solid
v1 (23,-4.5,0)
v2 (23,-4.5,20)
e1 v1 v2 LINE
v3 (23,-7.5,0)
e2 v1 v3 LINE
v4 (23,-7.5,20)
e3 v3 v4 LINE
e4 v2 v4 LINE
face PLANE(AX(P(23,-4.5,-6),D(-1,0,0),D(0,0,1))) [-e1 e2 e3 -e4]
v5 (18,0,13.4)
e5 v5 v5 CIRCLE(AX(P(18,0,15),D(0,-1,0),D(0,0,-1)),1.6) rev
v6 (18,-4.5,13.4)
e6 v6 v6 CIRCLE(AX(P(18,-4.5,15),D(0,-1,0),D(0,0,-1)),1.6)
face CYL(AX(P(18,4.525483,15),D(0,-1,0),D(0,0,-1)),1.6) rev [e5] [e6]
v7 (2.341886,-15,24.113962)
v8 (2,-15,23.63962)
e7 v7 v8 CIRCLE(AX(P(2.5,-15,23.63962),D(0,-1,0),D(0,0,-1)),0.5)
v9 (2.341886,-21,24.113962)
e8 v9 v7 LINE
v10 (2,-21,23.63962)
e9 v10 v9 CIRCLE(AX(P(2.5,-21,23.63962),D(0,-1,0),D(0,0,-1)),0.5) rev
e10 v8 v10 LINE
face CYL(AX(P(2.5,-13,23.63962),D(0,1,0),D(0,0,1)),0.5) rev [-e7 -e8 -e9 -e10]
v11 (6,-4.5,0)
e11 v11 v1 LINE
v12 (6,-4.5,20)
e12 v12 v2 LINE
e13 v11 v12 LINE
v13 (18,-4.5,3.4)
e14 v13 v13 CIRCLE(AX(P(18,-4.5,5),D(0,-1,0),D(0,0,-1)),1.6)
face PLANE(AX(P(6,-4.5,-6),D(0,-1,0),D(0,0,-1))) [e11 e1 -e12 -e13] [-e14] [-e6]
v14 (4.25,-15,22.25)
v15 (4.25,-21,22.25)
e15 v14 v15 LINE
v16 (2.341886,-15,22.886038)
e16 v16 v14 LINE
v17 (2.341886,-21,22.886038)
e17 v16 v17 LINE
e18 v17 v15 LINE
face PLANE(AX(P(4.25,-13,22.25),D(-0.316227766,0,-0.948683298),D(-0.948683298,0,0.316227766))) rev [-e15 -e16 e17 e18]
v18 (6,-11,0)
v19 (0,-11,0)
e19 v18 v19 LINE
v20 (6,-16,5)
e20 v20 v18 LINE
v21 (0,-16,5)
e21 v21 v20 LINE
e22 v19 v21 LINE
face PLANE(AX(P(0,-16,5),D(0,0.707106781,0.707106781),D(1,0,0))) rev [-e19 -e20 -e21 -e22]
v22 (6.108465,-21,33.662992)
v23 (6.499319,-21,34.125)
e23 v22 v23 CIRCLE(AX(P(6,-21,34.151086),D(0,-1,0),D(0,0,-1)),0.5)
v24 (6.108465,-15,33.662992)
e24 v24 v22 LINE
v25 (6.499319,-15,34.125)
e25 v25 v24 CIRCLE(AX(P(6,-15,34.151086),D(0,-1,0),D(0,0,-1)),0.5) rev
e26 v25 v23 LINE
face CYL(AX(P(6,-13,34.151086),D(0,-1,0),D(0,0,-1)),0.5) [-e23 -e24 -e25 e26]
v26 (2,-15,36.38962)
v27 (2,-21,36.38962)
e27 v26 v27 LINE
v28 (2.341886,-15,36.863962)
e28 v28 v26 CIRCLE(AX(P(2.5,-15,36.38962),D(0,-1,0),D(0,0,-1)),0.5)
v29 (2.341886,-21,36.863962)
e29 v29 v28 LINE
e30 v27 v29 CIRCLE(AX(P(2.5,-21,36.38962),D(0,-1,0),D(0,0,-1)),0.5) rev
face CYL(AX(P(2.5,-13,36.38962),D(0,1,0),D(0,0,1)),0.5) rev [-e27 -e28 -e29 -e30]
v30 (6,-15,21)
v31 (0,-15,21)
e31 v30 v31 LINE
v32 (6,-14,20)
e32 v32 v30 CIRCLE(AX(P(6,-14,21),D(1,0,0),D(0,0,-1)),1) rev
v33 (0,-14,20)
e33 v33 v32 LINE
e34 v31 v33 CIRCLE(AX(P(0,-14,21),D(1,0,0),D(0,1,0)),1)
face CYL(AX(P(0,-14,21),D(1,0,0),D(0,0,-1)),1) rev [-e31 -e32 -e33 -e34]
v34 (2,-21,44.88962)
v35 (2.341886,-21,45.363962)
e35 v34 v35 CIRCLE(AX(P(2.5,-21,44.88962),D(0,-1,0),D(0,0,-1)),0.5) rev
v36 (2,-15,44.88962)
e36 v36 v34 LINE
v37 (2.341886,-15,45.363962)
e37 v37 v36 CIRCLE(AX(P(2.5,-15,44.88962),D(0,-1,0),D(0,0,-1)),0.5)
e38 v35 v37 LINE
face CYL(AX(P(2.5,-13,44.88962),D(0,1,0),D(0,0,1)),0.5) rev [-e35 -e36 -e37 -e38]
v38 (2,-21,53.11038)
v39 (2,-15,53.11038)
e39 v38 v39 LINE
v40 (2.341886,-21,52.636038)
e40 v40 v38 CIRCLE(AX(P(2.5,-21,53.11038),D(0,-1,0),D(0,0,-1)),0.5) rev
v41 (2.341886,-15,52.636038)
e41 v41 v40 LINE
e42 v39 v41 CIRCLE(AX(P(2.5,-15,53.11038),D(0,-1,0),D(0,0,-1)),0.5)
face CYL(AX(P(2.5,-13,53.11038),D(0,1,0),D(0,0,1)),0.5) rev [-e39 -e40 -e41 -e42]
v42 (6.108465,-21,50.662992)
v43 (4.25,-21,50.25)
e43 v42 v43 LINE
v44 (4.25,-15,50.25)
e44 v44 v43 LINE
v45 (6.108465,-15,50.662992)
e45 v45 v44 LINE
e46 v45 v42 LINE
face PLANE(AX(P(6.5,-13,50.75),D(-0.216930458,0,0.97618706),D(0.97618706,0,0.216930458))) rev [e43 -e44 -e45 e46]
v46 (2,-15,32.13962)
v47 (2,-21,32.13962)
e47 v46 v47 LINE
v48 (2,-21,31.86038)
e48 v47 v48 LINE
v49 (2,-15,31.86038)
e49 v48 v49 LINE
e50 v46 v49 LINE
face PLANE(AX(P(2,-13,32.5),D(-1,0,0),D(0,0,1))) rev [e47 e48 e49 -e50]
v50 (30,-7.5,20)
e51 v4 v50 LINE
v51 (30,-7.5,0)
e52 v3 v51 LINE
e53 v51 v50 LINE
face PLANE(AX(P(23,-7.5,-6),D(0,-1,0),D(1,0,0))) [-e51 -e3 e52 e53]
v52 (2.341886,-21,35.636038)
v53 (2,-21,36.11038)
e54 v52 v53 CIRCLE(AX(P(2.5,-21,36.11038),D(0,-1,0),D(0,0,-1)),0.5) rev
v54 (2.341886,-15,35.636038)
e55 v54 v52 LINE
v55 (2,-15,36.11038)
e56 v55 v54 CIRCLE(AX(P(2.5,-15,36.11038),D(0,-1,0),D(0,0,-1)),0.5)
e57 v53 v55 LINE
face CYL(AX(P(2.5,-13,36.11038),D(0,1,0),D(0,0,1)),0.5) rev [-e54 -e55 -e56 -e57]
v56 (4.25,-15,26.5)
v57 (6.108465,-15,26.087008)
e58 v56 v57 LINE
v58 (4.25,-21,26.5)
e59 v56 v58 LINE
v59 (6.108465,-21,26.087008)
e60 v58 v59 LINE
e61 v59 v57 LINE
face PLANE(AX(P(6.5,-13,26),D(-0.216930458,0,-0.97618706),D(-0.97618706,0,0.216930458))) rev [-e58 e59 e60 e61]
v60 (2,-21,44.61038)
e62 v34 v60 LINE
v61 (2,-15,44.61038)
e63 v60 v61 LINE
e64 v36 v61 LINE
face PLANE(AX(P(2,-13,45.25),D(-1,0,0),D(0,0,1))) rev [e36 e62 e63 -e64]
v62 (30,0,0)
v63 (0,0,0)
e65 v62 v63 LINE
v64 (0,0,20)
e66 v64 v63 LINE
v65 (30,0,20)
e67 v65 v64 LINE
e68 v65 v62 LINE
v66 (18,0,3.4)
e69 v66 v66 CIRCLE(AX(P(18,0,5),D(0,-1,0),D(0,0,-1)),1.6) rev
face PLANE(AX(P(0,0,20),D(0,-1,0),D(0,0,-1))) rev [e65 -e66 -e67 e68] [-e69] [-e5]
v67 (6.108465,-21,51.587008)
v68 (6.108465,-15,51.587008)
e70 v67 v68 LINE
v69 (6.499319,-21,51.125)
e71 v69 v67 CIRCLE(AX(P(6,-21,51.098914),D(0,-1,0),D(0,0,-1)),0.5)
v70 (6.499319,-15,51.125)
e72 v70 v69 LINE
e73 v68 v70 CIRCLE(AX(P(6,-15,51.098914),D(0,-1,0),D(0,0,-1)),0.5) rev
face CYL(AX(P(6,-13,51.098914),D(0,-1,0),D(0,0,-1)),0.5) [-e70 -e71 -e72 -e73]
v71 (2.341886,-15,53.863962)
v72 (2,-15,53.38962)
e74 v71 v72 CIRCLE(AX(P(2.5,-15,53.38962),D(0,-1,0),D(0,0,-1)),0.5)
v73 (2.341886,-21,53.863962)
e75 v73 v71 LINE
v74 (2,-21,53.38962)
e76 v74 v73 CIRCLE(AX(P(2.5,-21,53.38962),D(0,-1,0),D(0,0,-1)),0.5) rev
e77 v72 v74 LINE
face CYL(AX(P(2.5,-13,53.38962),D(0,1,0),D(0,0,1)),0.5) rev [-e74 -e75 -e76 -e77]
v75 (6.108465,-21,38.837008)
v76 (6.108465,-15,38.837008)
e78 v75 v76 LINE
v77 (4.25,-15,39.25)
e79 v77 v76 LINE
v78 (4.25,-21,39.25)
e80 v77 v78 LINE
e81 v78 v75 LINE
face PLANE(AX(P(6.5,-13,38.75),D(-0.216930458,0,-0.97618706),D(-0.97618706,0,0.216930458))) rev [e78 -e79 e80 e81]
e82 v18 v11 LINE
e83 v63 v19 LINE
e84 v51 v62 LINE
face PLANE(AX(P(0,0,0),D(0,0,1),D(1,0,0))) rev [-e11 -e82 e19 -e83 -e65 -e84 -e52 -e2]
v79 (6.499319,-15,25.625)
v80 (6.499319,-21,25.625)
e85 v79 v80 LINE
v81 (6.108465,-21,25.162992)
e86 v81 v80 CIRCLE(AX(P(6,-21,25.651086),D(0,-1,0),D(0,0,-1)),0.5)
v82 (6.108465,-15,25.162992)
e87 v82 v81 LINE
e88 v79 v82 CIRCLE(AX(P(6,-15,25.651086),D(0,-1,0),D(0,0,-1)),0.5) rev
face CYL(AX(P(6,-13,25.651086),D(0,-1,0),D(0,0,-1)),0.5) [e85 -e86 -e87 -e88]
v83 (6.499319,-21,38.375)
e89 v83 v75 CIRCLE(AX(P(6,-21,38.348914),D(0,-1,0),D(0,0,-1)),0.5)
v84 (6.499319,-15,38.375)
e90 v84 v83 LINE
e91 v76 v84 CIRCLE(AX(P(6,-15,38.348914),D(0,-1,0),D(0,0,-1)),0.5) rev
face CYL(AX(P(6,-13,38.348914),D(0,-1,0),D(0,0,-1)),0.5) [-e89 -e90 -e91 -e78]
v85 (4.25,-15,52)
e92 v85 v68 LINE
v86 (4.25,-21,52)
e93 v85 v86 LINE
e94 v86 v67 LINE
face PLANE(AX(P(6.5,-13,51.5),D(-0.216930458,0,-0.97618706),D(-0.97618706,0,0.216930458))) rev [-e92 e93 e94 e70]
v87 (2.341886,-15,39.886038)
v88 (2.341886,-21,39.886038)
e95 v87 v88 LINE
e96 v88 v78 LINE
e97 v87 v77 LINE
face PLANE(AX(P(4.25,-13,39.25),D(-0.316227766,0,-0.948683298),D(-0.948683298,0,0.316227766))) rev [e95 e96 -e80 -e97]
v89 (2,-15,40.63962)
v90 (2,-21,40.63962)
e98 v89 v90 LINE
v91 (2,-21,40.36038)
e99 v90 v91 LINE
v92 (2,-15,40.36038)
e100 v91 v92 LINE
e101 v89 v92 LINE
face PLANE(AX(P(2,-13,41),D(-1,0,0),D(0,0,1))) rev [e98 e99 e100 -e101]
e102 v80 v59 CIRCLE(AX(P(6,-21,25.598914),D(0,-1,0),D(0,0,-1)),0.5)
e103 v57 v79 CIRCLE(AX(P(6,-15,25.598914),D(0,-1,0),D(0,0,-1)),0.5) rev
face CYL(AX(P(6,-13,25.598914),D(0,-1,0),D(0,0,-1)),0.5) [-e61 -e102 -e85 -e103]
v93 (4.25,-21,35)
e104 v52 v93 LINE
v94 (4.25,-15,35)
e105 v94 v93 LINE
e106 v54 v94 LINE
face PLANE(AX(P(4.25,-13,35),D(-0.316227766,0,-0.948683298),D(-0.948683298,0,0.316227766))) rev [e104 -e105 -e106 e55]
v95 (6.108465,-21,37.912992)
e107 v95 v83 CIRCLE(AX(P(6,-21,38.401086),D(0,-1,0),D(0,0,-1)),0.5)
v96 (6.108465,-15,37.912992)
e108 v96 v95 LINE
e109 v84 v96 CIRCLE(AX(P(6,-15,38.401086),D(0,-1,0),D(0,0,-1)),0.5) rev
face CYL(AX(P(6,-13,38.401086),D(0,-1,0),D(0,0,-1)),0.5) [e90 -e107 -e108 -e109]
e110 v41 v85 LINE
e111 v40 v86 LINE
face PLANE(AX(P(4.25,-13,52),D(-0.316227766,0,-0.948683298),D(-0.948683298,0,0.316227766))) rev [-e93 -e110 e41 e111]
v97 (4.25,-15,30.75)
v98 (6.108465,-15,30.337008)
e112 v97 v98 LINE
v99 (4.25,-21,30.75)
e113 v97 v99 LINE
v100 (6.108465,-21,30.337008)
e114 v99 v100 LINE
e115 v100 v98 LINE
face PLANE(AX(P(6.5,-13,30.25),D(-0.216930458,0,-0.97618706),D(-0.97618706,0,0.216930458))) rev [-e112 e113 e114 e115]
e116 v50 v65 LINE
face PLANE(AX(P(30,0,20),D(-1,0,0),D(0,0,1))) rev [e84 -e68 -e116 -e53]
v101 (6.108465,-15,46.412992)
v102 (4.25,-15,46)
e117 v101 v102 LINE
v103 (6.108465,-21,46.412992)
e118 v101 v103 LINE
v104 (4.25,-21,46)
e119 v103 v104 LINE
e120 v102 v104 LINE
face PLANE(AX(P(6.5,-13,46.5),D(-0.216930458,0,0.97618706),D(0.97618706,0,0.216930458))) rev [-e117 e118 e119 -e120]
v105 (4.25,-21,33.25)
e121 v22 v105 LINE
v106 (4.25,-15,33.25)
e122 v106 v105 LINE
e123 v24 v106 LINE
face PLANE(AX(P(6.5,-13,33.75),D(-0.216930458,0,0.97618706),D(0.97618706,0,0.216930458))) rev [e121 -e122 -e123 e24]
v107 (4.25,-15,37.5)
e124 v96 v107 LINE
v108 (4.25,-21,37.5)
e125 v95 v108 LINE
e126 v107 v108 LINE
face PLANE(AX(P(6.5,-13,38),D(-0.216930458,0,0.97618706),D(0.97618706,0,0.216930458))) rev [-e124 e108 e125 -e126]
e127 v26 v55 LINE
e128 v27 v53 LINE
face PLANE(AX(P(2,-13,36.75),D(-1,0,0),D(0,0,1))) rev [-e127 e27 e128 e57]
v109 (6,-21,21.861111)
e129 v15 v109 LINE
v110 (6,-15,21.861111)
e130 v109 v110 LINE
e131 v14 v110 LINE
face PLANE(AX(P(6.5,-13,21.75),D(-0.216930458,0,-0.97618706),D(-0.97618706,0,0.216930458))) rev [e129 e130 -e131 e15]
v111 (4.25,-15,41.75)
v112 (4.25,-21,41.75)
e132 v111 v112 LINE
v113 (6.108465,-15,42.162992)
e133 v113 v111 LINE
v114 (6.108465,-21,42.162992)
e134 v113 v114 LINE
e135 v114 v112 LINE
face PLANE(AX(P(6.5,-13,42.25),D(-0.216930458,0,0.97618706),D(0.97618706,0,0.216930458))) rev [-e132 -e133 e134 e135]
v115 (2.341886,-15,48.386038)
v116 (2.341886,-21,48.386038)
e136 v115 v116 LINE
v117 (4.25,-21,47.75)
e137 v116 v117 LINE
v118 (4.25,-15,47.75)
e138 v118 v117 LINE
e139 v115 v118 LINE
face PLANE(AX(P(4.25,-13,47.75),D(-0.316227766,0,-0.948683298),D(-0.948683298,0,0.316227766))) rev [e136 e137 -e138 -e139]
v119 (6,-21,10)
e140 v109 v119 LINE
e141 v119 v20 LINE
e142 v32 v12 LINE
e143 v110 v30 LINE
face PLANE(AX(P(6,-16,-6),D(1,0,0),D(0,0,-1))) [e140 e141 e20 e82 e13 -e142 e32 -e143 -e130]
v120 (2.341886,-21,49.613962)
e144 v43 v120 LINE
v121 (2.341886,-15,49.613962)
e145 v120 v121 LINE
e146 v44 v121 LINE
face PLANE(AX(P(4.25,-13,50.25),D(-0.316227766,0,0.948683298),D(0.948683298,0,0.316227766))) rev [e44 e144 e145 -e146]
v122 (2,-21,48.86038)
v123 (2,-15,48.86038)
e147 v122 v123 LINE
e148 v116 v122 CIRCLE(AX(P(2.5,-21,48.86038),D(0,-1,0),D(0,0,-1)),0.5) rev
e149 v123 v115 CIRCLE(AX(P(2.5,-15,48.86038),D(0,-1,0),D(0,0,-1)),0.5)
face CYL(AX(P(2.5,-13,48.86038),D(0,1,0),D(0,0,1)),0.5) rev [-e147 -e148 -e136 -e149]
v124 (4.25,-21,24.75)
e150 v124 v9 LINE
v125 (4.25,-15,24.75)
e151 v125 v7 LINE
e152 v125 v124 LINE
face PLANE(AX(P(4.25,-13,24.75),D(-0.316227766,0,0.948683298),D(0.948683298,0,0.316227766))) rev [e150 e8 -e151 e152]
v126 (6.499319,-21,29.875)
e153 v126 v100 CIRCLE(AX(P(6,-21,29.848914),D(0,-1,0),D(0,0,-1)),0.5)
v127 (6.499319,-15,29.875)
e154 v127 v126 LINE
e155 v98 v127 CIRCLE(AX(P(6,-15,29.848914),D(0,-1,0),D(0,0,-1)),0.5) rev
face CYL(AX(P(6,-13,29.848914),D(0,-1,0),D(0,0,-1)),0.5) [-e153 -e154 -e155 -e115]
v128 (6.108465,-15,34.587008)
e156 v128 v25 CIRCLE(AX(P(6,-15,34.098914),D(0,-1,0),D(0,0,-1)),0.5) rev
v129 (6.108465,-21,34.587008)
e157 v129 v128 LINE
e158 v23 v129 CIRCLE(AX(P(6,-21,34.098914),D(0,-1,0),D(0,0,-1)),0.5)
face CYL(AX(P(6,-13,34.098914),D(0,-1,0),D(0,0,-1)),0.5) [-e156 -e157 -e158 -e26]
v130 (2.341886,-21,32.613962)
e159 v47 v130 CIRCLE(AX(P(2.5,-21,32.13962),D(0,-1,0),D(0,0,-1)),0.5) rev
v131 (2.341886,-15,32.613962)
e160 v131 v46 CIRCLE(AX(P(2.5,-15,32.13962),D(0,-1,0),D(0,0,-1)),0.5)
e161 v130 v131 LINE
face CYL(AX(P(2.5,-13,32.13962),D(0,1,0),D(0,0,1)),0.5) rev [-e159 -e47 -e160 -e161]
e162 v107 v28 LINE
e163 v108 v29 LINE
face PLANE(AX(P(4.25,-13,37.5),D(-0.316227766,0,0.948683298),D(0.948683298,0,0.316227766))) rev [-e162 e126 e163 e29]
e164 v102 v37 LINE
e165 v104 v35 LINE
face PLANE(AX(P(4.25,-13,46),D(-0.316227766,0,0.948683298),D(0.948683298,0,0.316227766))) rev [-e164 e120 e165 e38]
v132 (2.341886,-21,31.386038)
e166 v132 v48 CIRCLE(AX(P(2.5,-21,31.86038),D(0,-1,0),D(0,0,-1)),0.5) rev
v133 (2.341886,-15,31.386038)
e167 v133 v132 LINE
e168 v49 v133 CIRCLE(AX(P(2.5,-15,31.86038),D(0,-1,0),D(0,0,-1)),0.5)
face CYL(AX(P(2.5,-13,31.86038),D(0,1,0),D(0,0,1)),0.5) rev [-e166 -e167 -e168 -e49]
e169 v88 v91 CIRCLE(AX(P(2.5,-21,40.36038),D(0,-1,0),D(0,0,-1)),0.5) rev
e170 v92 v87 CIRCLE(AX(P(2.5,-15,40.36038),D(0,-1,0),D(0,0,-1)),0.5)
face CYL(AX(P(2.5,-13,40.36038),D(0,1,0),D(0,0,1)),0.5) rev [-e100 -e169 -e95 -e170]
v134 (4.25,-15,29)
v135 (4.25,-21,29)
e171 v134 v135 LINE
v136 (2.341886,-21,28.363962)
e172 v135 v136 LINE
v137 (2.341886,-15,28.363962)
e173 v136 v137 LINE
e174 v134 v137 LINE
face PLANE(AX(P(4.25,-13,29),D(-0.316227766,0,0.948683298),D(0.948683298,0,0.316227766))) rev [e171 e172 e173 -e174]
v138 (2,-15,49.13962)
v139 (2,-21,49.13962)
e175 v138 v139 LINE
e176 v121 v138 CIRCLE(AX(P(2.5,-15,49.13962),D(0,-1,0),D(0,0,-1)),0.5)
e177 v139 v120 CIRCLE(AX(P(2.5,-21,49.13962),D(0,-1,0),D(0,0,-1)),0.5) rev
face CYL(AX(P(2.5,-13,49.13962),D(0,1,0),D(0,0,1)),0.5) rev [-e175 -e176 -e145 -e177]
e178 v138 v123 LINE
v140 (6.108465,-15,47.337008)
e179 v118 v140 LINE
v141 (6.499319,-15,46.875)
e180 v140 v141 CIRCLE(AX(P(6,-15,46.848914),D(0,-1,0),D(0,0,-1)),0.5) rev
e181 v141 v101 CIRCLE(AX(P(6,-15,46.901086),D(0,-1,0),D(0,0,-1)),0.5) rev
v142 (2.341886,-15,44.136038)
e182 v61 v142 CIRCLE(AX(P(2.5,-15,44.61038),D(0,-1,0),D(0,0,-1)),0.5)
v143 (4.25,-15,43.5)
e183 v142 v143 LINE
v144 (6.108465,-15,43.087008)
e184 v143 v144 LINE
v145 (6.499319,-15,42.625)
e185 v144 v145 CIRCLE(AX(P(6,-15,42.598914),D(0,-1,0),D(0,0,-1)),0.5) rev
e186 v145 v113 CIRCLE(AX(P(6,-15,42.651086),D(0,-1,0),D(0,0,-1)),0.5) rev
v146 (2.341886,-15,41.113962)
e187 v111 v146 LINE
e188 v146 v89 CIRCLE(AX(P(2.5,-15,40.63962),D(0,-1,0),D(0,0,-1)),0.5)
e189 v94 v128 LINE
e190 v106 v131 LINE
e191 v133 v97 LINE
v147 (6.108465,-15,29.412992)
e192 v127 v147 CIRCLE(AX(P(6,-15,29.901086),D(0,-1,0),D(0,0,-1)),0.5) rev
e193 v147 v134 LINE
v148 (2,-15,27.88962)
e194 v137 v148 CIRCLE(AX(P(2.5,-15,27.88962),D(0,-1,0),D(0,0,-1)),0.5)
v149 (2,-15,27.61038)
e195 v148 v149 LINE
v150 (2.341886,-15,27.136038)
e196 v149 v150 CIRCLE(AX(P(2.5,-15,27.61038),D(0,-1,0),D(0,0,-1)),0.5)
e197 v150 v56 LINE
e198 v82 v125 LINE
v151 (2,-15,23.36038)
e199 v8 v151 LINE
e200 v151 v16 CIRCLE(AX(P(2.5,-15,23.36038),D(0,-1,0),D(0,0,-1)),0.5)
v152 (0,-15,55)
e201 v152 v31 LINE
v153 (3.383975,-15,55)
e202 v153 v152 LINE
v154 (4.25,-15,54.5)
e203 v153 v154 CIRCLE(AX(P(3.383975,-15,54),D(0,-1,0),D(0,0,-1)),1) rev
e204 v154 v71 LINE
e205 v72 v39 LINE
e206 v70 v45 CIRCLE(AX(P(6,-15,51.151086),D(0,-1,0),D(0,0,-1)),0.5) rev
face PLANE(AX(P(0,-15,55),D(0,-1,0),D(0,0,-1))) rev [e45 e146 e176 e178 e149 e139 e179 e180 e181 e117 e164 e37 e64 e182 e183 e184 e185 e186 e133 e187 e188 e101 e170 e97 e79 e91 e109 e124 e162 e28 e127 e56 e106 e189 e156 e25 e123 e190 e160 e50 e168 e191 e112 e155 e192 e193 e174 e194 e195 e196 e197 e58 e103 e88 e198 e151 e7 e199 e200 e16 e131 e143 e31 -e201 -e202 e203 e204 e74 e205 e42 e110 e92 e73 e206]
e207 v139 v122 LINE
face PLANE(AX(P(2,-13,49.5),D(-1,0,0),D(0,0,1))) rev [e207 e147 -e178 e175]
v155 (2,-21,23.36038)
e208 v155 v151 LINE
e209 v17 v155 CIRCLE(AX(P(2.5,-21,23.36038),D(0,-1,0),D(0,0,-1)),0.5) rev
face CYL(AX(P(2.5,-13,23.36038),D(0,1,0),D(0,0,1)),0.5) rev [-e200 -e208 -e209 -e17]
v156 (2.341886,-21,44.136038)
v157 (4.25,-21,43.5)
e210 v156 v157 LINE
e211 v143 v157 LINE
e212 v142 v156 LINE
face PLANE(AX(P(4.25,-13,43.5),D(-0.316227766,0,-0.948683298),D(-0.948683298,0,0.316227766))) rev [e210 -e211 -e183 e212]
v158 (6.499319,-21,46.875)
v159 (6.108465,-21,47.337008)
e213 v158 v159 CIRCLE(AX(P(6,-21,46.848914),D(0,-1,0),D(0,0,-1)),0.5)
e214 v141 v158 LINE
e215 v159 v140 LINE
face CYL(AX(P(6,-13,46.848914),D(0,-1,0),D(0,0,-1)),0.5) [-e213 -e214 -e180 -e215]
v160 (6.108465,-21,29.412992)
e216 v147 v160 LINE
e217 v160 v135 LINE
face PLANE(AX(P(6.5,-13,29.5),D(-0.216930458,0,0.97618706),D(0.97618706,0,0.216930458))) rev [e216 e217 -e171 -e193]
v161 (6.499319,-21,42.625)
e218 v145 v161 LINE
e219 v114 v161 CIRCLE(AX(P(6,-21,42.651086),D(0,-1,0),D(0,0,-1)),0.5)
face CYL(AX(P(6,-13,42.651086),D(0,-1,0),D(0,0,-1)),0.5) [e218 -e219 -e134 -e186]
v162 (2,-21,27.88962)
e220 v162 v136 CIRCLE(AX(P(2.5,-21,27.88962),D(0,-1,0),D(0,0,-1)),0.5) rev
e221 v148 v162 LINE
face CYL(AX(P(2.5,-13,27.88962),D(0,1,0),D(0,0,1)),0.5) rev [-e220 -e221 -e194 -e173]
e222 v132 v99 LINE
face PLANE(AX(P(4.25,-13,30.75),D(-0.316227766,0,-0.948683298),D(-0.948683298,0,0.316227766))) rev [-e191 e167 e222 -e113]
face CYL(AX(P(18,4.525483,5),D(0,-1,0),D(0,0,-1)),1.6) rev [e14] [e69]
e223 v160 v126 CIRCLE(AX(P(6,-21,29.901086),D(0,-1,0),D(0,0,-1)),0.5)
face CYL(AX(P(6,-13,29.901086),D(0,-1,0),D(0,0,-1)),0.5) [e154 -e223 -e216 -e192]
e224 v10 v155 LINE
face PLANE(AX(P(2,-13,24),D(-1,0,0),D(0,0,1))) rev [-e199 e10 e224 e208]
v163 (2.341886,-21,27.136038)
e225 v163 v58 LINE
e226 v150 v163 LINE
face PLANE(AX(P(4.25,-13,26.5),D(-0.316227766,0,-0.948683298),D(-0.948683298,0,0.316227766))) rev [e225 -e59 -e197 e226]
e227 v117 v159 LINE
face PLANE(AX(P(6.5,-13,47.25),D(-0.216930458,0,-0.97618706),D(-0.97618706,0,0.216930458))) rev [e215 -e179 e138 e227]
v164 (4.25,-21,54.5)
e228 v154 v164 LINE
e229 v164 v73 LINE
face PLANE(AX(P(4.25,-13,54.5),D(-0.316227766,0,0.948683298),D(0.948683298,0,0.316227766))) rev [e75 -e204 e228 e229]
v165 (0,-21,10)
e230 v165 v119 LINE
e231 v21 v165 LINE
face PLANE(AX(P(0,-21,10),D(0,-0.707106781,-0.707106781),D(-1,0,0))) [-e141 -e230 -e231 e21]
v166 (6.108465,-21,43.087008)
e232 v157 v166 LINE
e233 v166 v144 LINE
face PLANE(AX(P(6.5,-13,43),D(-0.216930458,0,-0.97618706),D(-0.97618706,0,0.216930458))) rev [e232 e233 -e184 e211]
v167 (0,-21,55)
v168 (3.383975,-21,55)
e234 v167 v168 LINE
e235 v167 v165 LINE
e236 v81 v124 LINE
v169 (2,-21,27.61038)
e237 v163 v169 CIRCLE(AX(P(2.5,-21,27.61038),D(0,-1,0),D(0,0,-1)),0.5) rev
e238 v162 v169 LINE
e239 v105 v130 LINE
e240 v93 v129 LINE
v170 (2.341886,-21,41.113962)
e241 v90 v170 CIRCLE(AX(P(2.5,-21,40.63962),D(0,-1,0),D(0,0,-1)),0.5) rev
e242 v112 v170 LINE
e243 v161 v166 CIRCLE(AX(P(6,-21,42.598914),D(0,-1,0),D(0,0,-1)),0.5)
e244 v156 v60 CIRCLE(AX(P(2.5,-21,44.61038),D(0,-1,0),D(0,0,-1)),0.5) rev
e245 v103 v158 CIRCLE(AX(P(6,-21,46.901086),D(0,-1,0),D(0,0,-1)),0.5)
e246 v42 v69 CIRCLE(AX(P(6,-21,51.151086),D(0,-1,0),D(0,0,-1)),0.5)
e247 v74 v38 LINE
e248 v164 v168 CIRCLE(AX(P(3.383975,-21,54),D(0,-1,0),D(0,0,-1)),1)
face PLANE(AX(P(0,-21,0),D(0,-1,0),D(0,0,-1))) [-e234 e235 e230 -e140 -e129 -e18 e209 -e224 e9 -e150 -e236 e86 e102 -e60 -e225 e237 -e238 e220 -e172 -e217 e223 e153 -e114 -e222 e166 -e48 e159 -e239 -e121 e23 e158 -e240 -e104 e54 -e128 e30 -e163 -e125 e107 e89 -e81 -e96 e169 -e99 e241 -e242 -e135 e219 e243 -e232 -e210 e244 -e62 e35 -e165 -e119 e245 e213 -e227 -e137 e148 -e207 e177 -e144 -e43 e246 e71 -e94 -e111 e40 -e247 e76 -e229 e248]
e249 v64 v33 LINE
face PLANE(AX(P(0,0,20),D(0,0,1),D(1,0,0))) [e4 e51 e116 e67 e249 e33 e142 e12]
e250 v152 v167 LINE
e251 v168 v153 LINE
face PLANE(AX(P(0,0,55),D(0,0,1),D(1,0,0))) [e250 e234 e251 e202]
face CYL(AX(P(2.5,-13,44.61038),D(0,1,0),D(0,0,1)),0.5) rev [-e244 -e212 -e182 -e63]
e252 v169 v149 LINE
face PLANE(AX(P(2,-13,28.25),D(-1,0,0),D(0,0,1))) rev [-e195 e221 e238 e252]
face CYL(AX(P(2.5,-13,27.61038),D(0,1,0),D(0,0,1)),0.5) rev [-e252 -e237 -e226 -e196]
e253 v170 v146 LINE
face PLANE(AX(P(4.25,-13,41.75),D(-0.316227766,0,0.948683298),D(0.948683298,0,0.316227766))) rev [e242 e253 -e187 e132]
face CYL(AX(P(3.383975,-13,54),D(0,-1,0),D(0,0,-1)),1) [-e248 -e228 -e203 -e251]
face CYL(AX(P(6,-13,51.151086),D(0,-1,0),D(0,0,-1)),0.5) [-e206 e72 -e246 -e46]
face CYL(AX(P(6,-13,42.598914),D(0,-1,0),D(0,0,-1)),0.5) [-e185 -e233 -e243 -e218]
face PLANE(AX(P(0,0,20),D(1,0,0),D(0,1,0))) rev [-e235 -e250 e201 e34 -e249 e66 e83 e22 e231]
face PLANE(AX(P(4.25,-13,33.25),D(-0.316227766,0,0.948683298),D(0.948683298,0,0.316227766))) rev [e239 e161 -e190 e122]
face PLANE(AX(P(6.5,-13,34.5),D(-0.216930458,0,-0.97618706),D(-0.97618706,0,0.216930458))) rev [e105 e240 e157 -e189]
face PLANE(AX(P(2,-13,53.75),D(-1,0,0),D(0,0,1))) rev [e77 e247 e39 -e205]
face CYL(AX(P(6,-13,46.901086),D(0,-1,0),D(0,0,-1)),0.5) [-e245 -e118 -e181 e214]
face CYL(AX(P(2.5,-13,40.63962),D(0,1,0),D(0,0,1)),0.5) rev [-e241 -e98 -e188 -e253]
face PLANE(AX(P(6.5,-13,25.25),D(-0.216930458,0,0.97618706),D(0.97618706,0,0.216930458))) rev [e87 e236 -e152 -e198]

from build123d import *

# Parameters (mm, degrees)
SKETCH1_W           = 30
SKETCH1_H           = 16
BOSS_EXTRUDE1_DEPTH = 20
CUT_EXTRUDE1_START  = -20
CUT_EXTRUDE1_DEPTH  = 20
SKETCH3_W           = 6
SKETCH3_H           = 10
BOSS_EXTRUDE2_DEPTH = 5
SKETCH9_R           = 1.6
CUT_EXTRUDE3_DEPTH  = 4.5
SKETCH11_W          = 8
SKETCH11_H          = 6
BOSS_EXTRUDE4_DEPTH = 40
FILLET1_R           = 1
CUT_EXTRUDE4_START  = -6
CUT_EXTRUDE4_DEPTH  = 6
SKETCH13_W          = 2
SKETCH13_H          = 6
BOSS_EXTRUDE5_DEPTH = 10
LPATTERN1_COUNT     = 8
LPATTERN1_PITCH     = 4.25
FILLET2_R           = 0.5
FILLET3_R           = 1
SKETCH14_W          = 2
SKETCH14_H          = 6
CUT_EXTRUDE5_DEPTH  = 17
CHAMFER9_SIZE       = 5


# Read off the part's stored shape, not the designer's step: Cut-Extrude1, Cut-Extrude4
with BuildPart() as part:
    # Sketch1 → Boss-Extrude1 (new body)
    with BuildSketch(Plane.XY):
        with Locations((15, -8)):
            Rectangle(SKETCH1_W, SKETCH1_H)
    extrude(amount=BOSS_EXTRUDE1_DEPTH)

    # Cut-Extrude1 outline → Cut-Extrude1 (cut)
    with BuildSketch(Plane.XY.offset(20).offset(CUT_EXTRUDE1_START)):
        Polygon((6, -4.5), (6, -16), (30, -16), (30, -7.5), (23, -7.5), (23, -4.5), align=None)
    extrude(amount=CUT_EXTRUDE1_DEPTH, mode=Mode.SUBTRACT)

    # Sketch3 → Boss-Extrude2 (add)
    with BuildSketch(Plane.XZ.offset(16)):
        with Locations((3, 10)):
            Rectangle(SKETCH3_W, SKETCH3_H)
    extrude(amount=BOSS_EXTRUDE2_DEPTH)

    # Sketch9 → Cut-Extrude3 (cut)
    with BuildSketch(Plane.XZ.offset(4.5)):
        with Locations(Location((18, 15, 0), (0, 0, 270))):
            Circle(SKETCH9_R)
        with Locations(Location((18, 5, 0), (0, 0, 270))):
            Circle(SKETCH9_R)
    extrude(amount=-CUT_EXTRUDE3_DEPTH, mode=Mode.SUBTRACT)

    # Sketch11 → Boss-Extrude4 (add)
    with BuildSketch(Plane.XY.offset(15)):
        with Locations((4, -18)):
            Rectangle(SKETCH11_W, SKETCH11_H)
    extrude(amount=BOSS_EXTRUDE4_DEPTH)

    # Fillet1
    fillet1_edges = [part.edges().sort_by_distance(p)[0] for p in [
        (3, -15, 20),
    ]]
    fillet(fillet1_edges, radius=FILLET1_R)

    # Cut-Extrude4 outline → Cut-Extrude4 (cut)
    with BuildSketch(Plane.XZ.offset(21).offset(CUT_EXTRUDE4_START)):
        Polygon((6.5, 51.5), (6.5, 50.75), (8, 50.75), (8, 55), (6.5, 55), (4.25, 54.5), (2, 53.75), (2, 52.75), (4.25, 52), align=None)
    cut_extrude4 = extrude(amount=CUT_EXTRUDE4_DEPTH, mode=Mode.SUBTRACT)

    # Sketch13 → Boss-Extrude5 (add)
    with BuildSketch(Plane(origin=(0, 0, 15), x_dir=(-1, 0, 0), z_dir=(0, 0, -1))):
        with Locations((-7, -18)):
            Rectangle(SKETCH13_W, SKETCH13_H)
    extrude(amount=BOSS_EXTRUDE5_DEPTH)

    # LPattern1: Cut-Extrude4 ×8
    with Locations(*[(0, 0, -i * LPATTERN1_PITCH) for i in range(1, LPATTERN1_COUNT)]):
        add(cut_extrude4, mode=Mode.SUBTRACT)

    # Fillet2
    # the kernel refuses this fillet: 0.5 mm, written as the material it adds along each edge
    with BuildSketch(Plane(origin=(2, -15, 52.75), x_dir=(0.9486832980505131, 0, -0.3162277660168398), z_dir=(0, -1, 0)), Plane(origin=(2, -15, 53.75), x_dir=(0, 0, -1), z_dir=(0, -1, 0)), Plane(origin=(2, -15, 48.5), x_dir=(0.9486832980505137, 0, -0.3162277660168381), z_dir=(0, -1, 0)), Plane(origin=(2, -15, 49.5), x_dir=(0, 0, -1), z_dir=(0, -1, 0)), Plane(origin=(2, -15, 44.25), x_dir=(0.9486832980505137, 0, -0.3162277660168381), z_dir=(0, -1, 0)), Plane(origin=(2, -15, 35.75), x_dir=(0.948683298050514, 0, -0.316227766016837), z_dir=(0, -1, 0)), Plane(origin=(2, -15, 36.75), x_dir=(0, 0, -1), z_dir=(0, -1, 0)), Plane(origin=(2, -15, 40), x_dir=(0.9486832980505137, 0, -0.31622776601683833), z_dir=(0, -1, 0)), Plane(origin=(2, -15, 41), x_dir=(0, 0, -1), z_dir=(0, -1, 0)), Plane(origin=(2, -15, 23), x_dir=(0.9486832980505137, 0, -0.31622776601683833), z_dir=(0, -1, 0)), Plane(origin=(2, -15, 24), x_dir=(0, 0, -1), z_dir=(0, -1, 0)), Plane(origin=(2, -15, 27.25), x_dir=(0.9486832980505135, 0, -0.3162277660168391), z_dir=(0, -1, 0)), Plane(origin=(2, -15, 28.25), x_dir=(0, 0, -1), z_dir=(0, -1, 0)), Plane(origin=(2, -15, 32.5), x_dir=(0, 0, -1), z_dir=(0, -1, 0)), Plane(origin=(2, -15, 31.5), x_dir=(0.9486832980505139, 0, -0.3162277660168378), z_dir=(0, -1, 0))) as fillet2_piece_1:
        with BuildLine():
            CenterArc((FILLET2_R * 0.720759220056, FILLET2_R), FILLET2_R, 198.434948823, 71.565051177)
            Line((-FILLET2_R * 0.227924077994, FILLET2_R * 0.683772233983), (0, 0))
            Line((0, 0), (FILLET2_R * 0.720759220056, 0))
        make_face()
    extrude(amount=6)
    with BuildSketch(Plane(origin=(2, -15, 45.25), x_dir=(0.948683298050513, 0, 0.31622776601684033), z_dir=(0, -1, 0))) as fillet2_piece_2:
        with BuildLine():
            CenterArc((FILLET2_R * 0.720759220056, -FILLET2_R), FILLET2_R, 90, 71.565051177)
            Line((-FILLET2_R * 0.227924077994, -FILLET2_R * 0.683772233983), (0, 0))
            Line((0, 0), (FILLET2_R * 0.720759220056, 0))
        make_face()
    extrude(amount=6)
    # the kernel refuses this fillet: 0.5 mm, written as the material it takes off along each edge
    with BuildSketch(Plane(origin=(6.5, -13.997285492, 33.75), x_dir=(-0.9761870601839541, 0, -0.21693045781865056), z_dir=(0, -1, 0)), Plane(origin=(6.5, -13.997285492, 34.5), x_dir=(0, 0, -1), z_dir=(0, -1, 0)), Plane(origin=(6.5, -13.997285492, 38), x_dir=(-0.9761870601839538, 0, -0.216930457818651), z_dir=(0, -1, 0)), Plane(origin=(6.5, -13.997285492, 38.75), x_dir=(0, 0, -1), z_dir=(0, -1, 0)), Plane(origin=(6.5, -13.997285492, 42.25), x_dir=(-0.9761870601839541, 0, -0.21693045781865006), z_dir=(0, -1, 0)), Plane(origin=(6.5, -13.997285492, 43), x_dir=(0, 0, -1), z_dir=(0, -1, 0)), Plane(origin=(6.5, -13.997285492, 46.5), x_dir=(-0.9761870601839537, 0, -0.21693045781865147), z_dir=(0, -1, 0)), Plane(origin=(6.5, -13.997285492, 47.25), x_dir=(0, 0, -1), z_dir=(0, -1, 0)), Plane(origin=(6.5, -13.997285492, 50.75), x_dir=(-0.9761870601839537, 0, -0.21693045781865147), z_dir=(0, -1, 0)), Plane(origin=(6.5, -13.997285492, 51.5), x_dir=(0, 0, -1), z_dir=(0, -1, 0)), Plane(origin=(6.5, -13.997285492, 25.25), x_dir=(-0.9761870601839521, 0, -0.21693045781865947), z_dir=(0, -1, 0)), Plane(origin=(6.5, -13.997285492, 26), x_dir=(0, 0, -1), z_dir=(0, -1, 0)), Plane(origin=(6.5, -13.997285492, 29.5), x_dir=(-0.9761870601839522, 0, -0.2169304578186585), z_dir=(0, -1, 0)), Plane(origin=(6.5, -13.997285492, 30.25), x_dir=(0, 0, -1), z_dir=(0, -1, 0))) as fillet2_2_piece_1:
        with BuildLine():
            CenterArc((FILLET2_R * 0.802171606366, -FILLET2_R), FILLET2_R, 90, 77.471192291)
            Line((-FILLET2_R * 0.174015453818, -FILLET2_R * 0.783069542181), (0, 0))
            Line((0, 0), (FILLET2_R * 0.802171606366, 0))
        make_face()
    extrude(amount=8.005429016, mode=Mode.SUBTRACT)

    # Fillet3
    # the kernel refuses this fillet: 1 mm, written as the material it takes off along each edge
    with BuildSketch(Plane(origin=(6.5, -7.209936491, 55), x_dir=(-0.9761870601839528, 0, -0.21693045781865575), z_dir=(0, -1, 0))) as fillet3_piece_1:
        with BuildLine():
            CenterArc((3.258754136, 0.300226243), FILLET3_R, 197.471192291, 60)
            Line((3.041823678, -0.675960817), (0, 0))
            Line((0, 0), (2.304886114, 0))
        make_face()
    extrude(amount=21.580127019, mode=Mode.SUBTRACT)

    # Sketch14 → Cut-Extrude5 (cut)
    with BuildSketch(Plane(origin=(0, 0, 5), x_dir=(-1, 0, 0), z_dir=(0, 0, -1))):
        with Locations((-7, -18)):
            Rectangle(SKETCH14_W, SKETCH14_H)
    extrude(amount=-CUT_EXTRUDE5_DEPTH, mode=Mode.SUBTRACT)

    # Chamfer9
    # the kernel refuses this chamfer: 5 mm, written as the material it adds along each edge
    # the kernel refuses this chamfer: 5 mm, written as the material it takes off along each edge
    with BuildSketch(Plane(origin=(18.85841494, -21, 5), x_dir=(0, -0.027495876610586393, 0.9996219169112968), z_dir=(-1, 0, 0))) as chamfer9_2_piece_1:
        Polygon((CHAMFER9_SIZE * 0.999621916911, CHAMFER9_SIZE * 0.0274958766106), (-CHAMFER9_SIZE * 0.0274958766106, CHAMFER9_SIZE * 0.999621916911), (0, 0), align=None)
    extrude(amount=31.71682988, mode=Mode.SUBTRACT)
    with BuildSketch(Plane(origin=(18.85841494, -16, 0), x_dir=(0, 0.9996219169112968, -0.027495876610586372), z_dir=(-1, 0, 0))) as chamfer9_2_piece_2:
        Polygon((CHAMFER9_SIZE * 0.999621916911, -CHAMFER9_SIZE * 0.0274958766106), (-CHAMFER9_SIZE * 0.0274958766106, -CHAMFER9_SIZE * 0.999621916911), (0, 0), align=None)
    extrude(amount=31.71682988, mode=Mode.SUBTRACT)


solid = part.part
